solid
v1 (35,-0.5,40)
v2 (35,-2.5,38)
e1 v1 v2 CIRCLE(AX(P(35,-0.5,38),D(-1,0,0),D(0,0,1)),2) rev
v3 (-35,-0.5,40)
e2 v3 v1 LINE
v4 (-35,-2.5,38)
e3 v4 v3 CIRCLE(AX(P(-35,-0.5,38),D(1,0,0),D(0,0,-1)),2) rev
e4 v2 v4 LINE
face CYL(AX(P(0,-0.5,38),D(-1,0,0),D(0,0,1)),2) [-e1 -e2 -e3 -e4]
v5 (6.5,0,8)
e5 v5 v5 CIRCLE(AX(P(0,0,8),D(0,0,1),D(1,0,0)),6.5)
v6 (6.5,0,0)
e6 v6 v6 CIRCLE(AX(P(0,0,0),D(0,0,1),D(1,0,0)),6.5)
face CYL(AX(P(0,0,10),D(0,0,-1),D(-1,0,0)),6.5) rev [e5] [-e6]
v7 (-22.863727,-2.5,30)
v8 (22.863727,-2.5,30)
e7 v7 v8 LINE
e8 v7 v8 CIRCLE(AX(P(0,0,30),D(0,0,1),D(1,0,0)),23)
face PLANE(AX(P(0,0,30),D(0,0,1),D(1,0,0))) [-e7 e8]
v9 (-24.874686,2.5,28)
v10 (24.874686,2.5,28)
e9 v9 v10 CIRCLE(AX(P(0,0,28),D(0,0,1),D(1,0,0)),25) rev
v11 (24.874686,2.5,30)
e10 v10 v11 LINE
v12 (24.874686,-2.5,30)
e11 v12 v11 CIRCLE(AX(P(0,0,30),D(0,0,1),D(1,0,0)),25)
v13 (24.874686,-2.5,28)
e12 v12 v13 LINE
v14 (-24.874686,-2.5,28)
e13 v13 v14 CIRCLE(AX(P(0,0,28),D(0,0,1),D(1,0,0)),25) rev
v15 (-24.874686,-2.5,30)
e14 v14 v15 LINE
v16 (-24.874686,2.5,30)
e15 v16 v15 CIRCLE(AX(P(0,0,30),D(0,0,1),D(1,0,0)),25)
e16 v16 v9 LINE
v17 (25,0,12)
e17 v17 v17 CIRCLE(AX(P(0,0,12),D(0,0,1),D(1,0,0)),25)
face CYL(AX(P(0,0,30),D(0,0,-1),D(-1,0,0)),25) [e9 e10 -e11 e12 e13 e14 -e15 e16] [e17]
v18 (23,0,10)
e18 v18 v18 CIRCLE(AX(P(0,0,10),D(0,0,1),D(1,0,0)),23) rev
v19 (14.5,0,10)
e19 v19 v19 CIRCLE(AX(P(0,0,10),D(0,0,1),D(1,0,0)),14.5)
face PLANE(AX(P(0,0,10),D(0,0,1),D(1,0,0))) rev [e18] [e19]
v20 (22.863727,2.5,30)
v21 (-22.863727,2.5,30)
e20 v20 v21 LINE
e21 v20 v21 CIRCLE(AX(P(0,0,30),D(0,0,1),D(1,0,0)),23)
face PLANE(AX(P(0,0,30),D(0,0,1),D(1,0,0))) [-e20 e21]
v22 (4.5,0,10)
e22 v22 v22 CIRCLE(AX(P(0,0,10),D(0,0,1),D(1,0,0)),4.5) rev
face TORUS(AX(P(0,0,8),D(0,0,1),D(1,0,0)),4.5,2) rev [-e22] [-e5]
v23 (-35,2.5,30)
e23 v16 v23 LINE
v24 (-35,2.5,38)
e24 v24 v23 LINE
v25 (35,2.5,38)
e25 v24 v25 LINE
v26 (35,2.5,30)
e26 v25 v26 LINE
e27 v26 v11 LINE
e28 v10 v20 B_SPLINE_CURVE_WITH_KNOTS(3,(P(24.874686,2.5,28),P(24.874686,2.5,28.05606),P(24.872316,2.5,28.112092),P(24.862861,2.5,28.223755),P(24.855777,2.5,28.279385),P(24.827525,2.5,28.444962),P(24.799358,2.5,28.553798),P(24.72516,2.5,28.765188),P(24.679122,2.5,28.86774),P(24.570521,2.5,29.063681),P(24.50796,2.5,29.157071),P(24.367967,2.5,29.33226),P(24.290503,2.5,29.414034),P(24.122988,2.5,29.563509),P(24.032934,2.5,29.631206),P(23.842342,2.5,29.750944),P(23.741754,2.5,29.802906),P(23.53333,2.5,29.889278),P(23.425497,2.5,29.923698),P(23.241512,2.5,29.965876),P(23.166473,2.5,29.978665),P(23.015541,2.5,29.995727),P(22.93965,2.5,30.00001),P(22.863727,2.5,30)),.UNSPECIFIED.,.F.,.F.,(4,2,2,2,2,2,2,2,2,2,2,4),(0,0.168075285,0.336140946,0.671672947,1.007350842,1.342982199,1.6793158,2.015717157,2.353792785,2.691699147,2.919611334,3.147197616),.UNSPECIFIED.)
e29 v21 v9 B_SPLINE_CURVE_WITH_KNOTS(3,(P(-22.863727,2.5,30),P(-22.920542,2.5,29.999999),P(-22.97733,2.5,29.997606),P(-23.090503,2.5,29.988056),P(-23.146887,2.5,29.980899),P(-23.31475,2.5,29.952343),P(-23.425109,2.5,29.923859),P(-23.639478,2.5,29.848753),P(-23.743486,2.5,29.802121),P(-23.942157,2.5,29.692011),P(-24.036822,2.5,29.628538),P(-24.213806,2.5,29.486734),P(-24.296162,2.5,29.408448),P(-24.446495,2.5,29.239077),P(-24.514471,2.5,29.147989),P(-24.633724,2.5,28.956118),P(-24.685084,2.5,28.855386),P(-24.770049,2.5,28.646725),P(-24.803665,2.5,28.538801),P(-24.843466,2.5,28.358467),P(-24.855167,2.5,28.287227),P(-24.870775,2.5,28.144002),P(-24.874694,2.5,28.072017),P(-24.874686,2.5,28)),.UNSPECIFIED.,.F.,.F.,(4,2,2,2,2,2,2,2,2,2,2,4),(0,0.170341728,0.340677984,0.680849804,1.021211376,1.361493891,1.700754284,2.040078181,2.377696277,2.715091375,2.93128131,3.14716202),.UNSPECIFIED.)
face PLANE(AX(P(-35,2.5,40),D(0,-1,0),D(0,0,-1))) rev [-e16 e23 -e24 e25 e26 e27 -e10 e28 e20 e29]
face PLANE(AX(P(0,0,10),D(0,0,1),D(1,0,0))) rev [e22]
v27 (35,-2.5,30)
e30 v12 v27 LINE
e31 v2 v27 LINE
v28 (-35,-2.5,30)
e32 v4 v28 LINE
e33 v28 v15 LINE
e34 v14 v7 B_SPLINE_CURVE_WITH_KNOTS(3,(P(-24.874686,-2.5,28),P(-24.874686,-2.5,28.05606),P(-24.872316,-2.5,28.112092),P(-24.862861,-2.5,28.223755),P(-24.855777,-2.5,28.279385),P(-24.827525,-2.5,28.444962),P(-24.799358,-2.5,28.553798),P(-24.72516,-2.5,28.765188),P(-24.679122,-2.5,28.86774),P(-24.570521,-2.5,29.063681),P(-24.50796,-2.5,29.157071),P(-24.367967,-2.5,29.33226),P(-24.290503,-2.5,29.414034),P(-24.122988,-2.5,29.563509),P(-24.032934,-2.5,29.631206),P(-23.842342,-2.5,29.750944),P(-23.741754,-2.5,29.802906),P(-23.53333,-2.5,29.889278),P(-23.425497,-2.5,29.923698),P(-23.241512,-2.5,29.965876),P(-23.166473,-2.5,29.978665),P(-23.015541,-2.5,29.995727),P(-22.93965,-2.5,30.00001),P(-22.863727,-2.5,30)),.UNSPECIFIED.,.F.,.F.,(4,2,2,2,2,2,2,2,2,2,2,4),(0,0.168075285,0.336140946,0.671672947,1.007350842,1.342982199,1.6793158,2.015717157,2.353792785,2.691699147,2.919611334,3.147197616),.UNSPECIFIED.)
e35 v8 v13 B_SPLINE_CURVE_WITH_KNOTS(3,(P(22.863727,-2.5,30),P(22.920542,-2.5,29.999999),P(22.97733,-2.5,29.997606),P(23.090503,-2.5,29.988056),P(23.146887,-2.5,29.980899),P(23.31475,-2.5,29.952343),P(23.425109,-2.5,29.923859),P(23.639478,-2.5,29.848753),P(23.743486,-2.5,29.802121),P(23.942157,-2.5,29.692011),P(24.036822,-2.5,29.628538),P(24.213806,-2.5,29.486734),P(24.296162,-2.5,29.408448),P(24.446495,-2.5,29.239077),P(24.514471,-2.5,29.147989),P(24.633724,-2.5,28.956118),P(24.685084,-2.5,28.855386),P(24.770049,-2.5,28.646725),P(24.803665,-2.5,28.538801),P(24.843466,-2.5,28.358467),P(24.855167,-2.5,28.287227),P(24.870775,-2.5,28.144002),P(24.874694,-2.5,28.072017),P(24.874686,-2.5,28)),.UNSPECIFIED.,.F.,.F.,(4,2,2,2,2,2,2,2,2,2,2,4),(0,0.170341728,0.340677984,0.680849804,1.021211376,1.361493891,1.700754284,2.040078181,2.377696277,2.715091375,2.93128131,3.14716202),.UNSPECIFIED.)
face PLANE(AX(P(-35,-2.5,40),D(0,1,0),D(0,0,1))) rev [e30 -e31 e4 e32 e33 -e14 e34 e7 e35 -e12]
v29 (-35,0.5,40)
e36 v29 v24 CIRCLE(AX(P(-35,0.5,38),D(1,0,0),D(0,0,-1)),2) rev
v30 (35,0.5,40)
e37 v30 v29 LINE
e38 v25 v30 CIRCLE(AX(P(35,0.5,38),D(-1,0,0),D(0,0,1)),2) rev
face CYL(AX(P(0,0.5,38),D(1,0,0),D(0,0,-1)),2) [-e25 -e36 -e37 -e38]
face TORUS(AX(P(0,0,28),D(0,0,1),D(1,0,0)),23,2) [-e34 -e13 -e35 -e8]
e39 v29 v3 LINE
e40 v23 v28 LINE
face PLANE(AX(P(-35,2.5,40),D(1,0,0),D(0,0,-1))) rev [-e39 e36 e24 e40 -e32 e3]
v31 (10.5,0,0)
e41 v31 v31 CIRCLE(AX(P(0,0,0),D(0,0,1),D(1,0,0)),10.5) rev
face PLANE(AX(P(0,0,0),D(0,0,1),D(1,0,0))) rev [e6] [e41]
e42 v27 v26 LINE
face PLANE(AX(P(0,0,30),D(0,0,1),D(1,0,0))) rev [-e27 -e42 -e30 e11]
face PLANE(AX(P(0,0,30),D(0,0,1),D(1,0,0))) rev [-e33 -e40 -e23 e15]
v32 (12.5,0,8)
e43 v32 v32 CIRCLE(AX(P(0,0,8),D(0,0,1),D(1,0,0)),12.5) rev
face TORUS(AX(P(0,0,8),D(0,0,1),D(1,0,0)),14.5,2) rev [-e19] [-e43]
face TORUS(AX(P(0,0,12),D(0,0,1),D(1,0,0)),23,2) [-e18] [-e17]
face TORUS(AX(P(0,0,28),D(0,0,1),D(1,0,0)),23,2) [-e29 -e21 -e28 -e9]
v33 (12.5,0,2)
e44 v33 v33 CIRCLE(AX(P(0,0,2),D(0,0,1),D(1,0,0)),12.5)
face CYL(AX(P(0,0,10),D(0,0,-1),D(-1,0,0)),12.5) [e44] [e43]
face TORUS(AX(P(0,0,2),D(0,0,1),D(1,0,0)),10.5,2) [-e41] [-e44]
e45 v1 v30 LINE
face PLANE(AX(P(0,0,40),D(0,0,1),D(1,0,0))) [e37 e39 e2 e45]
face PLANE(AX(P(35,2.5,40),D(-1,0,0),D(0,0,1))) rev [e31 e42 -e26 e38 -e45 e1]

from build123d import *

# Parameters (mm, degrees)
CROQUIS1_R              = 12.5
CROQUIS1_R_2            = 6.5
SALIENTE_EXTRUIR1_DEPTH = 10
CROQUIS2_R              = 25
SALIENTE_EXTRUIR2_DEPTH = 20
CROQUIS3_W              = 70
CROQUIS3_H              = 5
SALIENTE_EXTRUIR3_DEPTH = 10
REDONDEO1_R             = 2


with BuildPart() as part:
    # Croquis1 → Saliente-Extruir1 (new body)
    with BuildSketch(Plane.XY):
        Circle(CROQUIS1_R)
        Circle(CROQUIS1_R_2, mode=Mode.SUBTRACT)
    extrude(amount=SALIENTE_EXTRUIR1_DEPTH)

    # Croquis2 → Saliente-Extruir2 (add)
    with BuildSketch(Plane.XY.offset(10)):
        Circle(CROQUIS2_R)
    extrude(amount=SALIENTE_EXTRUIR2_DEPTH)

    # Croquis3 → Saliente-Extruir3 (add)
    with BuildSketch(Plane.XY.offset(30)):
        Rectangle(CROQUIS3_W, CROQUIS3_H)
    extrude(amount=SALIENTE_EXTRUIR3_DEPTH)

    # Redondeo1
    # the kernel refuses this fillet: 2 mm, written as the material it adds along each edge
    with BuildSketch(Plane(origin=(0, 0, 10), x_dir=(1, 0, 0), z_dir=(0, -1, 0))) as redondeo1_piece_1:
        with BuildLine():
            CenterArc((6.5 - REDONDEO1_R, -REDONDEO1_R), REDONDEO1_R, 0, 90)
            Line((6.5 - REDONDEO1_R, 0), (6.5, 0))
            Line((6.5, 0), (6.5, -REDONDEO1_R))
        make_face()
    revolve(axis=Axis((0, 0, 10), (0, 0, 1)))
    with BuildSketch(Plane(origin=(0, 0, 10), x_dir=(1, 0, 0), z_dir=(0, -1, 0))) as redondeo1_piece_2:
        with BuildLine():
            CenterArc((12.5 + REDONDEO1_R, -REDONDEO1_R), REDONDEO1_R, 90, 90)
            Line((12.5, -REDONDEO1_R), (12.5, 0))
            Line((12.5, 0), (12.5 + REDONDEO1_R, 0))
        make_face()
    revolve(axis=Axis((0, 0, 10), (0, 0, 1)))
    # the kernel refuses this fillet: 2 mm, written as the material it takes off along each edge
    with BuildSketch(Plane(origin=(0, 0, 10), x_dir=(1, 0, 0), z_dir=(0, -1, 0))) as redondeo1_2_piece_1:
        with BuildLine():
            CenterArc((25 - REDONDEO1_R, REDONDEO1_R), REDONDEO1_R, 270, 90)
            Line((25 - REDONDEO1_R, 0), (25, 0))
            Line((25, 0), (25, REDONDEO1_R))
        make_face()
    revolve(axis=Axis((0, 0, 10), (0, 0, 1)), mode=Mode.SUBTRACT)
    with BuildSketch(Plane(origin=(0, 0, 30), x_dir=(0.9949927313637517, -0.09994730878468465, 0), z_dir=(-0.09994730878468465, -0.9949927313637517, 0))) as redondeo1_2_piece_2_section:
        with BuildLine():
            CenterArc((25 - REDONDEO1_R, -REDONDEO1_R), REDONDEO1_R, 0, 90)
            Line((25 - REDONDEO1_R, 0), (25, 0))
            Line((25, 0), (25, -REDONDEO1_R))
        make_face()
    redondeo1_2_piece_2 = revolve(axis=Axis((0, 0, 30), (0, 0, 1)), revolution_arc=191.472272584, mode=Mode.PRIVATE)
    redondeo1_2_piece_2 = split(redondeo1_2_piece_2, bisect_by=Plane(origin=(0, 2.5, 29.442187305), z_dir=(0, 1, 0)), keep=Keep.TOP, mode=Mode.PRIVATE)
    add(redondeo1_2_piece_2, mode=Mode.SUBTRACT)
    with BuildSketch(Plane(origin=(0, 0, 30), x_dir=(-0.9949927313637487, 0.09994730878471461, 0), z_dir=(0.09994730878471461, 0.9949927313637487, 0))) as redondeo1_2_piece_3_section:
        with BuildLine():
            CenterArc((25 - REDONDEO1_R, -REDONDEO1_R), REDONDEO1_R, 0, 90)
            Line((25 - REDONDEO1_R, 0), (25, 0))
            Line((25, 0), (25, -REDONDEO1_R))
        make_face()
    redondeo1_2_piece_3 = revolve(axis=Axis((0, 0, 30), (0, 0, 1)), revolution_arc=191.472272584, mode=Mode.PRIVATE)
    redondeo1_2_piece_3 = split(redondeo1_2_piece_3, bisect_by=Plane(origin=(0, -2.5, 29.442187305), z_dir=(0, -1, 0)), keep=Keep.TOP, mode=Mode.PRIVATE)
    add(redondeo1_2_piece_3, mode=Mode.SUBTRACT)
    with BuildSketch(Plane(origin=(0, 0, 0), x_dir=(1, 0, 0), z_dir=(0, -1, 0))) as redondeo1_2_piece_4:
        with BuildLine():
            CenterArc((12.5 - REDONDEO1_R, REDONDEO1_R), REDONDEO1_R, 270, 90)
            Line((12.5 - REDONDEO1_R, 0), (12.5, 0))
            Line((12.5, 0), (12.5, REDONDEO1_R))
        make_face()
    revolve(axis=Axis((0, 0, 0), (0, 0, 1)), mode=Mode.SUBTRACT)
    with BuildSketch(Plane(origin=(-40, 2.5, 40), x_dir=(0, 0, -1), z_dir=(1, 0, 0)), Plane(origin=(40, -2.5, 40), x_dir=(0, 0, -1), z_dir=(-1, 0, 0))) as redondeo1_2_piece_5:
        with BuildLine():
            CenterArc((REDONDEO1_R, -REDONDEO1_R), REDONDEO1_R, 90, 90)
            Line((0, -REDONDEO1_R), (0, 0))
            Line((0, 0), (REDONDEO1_R, 0))
        make_face()
    extrude(amount=80, mode=Mode.SUBTRACT)


solid = part.part
